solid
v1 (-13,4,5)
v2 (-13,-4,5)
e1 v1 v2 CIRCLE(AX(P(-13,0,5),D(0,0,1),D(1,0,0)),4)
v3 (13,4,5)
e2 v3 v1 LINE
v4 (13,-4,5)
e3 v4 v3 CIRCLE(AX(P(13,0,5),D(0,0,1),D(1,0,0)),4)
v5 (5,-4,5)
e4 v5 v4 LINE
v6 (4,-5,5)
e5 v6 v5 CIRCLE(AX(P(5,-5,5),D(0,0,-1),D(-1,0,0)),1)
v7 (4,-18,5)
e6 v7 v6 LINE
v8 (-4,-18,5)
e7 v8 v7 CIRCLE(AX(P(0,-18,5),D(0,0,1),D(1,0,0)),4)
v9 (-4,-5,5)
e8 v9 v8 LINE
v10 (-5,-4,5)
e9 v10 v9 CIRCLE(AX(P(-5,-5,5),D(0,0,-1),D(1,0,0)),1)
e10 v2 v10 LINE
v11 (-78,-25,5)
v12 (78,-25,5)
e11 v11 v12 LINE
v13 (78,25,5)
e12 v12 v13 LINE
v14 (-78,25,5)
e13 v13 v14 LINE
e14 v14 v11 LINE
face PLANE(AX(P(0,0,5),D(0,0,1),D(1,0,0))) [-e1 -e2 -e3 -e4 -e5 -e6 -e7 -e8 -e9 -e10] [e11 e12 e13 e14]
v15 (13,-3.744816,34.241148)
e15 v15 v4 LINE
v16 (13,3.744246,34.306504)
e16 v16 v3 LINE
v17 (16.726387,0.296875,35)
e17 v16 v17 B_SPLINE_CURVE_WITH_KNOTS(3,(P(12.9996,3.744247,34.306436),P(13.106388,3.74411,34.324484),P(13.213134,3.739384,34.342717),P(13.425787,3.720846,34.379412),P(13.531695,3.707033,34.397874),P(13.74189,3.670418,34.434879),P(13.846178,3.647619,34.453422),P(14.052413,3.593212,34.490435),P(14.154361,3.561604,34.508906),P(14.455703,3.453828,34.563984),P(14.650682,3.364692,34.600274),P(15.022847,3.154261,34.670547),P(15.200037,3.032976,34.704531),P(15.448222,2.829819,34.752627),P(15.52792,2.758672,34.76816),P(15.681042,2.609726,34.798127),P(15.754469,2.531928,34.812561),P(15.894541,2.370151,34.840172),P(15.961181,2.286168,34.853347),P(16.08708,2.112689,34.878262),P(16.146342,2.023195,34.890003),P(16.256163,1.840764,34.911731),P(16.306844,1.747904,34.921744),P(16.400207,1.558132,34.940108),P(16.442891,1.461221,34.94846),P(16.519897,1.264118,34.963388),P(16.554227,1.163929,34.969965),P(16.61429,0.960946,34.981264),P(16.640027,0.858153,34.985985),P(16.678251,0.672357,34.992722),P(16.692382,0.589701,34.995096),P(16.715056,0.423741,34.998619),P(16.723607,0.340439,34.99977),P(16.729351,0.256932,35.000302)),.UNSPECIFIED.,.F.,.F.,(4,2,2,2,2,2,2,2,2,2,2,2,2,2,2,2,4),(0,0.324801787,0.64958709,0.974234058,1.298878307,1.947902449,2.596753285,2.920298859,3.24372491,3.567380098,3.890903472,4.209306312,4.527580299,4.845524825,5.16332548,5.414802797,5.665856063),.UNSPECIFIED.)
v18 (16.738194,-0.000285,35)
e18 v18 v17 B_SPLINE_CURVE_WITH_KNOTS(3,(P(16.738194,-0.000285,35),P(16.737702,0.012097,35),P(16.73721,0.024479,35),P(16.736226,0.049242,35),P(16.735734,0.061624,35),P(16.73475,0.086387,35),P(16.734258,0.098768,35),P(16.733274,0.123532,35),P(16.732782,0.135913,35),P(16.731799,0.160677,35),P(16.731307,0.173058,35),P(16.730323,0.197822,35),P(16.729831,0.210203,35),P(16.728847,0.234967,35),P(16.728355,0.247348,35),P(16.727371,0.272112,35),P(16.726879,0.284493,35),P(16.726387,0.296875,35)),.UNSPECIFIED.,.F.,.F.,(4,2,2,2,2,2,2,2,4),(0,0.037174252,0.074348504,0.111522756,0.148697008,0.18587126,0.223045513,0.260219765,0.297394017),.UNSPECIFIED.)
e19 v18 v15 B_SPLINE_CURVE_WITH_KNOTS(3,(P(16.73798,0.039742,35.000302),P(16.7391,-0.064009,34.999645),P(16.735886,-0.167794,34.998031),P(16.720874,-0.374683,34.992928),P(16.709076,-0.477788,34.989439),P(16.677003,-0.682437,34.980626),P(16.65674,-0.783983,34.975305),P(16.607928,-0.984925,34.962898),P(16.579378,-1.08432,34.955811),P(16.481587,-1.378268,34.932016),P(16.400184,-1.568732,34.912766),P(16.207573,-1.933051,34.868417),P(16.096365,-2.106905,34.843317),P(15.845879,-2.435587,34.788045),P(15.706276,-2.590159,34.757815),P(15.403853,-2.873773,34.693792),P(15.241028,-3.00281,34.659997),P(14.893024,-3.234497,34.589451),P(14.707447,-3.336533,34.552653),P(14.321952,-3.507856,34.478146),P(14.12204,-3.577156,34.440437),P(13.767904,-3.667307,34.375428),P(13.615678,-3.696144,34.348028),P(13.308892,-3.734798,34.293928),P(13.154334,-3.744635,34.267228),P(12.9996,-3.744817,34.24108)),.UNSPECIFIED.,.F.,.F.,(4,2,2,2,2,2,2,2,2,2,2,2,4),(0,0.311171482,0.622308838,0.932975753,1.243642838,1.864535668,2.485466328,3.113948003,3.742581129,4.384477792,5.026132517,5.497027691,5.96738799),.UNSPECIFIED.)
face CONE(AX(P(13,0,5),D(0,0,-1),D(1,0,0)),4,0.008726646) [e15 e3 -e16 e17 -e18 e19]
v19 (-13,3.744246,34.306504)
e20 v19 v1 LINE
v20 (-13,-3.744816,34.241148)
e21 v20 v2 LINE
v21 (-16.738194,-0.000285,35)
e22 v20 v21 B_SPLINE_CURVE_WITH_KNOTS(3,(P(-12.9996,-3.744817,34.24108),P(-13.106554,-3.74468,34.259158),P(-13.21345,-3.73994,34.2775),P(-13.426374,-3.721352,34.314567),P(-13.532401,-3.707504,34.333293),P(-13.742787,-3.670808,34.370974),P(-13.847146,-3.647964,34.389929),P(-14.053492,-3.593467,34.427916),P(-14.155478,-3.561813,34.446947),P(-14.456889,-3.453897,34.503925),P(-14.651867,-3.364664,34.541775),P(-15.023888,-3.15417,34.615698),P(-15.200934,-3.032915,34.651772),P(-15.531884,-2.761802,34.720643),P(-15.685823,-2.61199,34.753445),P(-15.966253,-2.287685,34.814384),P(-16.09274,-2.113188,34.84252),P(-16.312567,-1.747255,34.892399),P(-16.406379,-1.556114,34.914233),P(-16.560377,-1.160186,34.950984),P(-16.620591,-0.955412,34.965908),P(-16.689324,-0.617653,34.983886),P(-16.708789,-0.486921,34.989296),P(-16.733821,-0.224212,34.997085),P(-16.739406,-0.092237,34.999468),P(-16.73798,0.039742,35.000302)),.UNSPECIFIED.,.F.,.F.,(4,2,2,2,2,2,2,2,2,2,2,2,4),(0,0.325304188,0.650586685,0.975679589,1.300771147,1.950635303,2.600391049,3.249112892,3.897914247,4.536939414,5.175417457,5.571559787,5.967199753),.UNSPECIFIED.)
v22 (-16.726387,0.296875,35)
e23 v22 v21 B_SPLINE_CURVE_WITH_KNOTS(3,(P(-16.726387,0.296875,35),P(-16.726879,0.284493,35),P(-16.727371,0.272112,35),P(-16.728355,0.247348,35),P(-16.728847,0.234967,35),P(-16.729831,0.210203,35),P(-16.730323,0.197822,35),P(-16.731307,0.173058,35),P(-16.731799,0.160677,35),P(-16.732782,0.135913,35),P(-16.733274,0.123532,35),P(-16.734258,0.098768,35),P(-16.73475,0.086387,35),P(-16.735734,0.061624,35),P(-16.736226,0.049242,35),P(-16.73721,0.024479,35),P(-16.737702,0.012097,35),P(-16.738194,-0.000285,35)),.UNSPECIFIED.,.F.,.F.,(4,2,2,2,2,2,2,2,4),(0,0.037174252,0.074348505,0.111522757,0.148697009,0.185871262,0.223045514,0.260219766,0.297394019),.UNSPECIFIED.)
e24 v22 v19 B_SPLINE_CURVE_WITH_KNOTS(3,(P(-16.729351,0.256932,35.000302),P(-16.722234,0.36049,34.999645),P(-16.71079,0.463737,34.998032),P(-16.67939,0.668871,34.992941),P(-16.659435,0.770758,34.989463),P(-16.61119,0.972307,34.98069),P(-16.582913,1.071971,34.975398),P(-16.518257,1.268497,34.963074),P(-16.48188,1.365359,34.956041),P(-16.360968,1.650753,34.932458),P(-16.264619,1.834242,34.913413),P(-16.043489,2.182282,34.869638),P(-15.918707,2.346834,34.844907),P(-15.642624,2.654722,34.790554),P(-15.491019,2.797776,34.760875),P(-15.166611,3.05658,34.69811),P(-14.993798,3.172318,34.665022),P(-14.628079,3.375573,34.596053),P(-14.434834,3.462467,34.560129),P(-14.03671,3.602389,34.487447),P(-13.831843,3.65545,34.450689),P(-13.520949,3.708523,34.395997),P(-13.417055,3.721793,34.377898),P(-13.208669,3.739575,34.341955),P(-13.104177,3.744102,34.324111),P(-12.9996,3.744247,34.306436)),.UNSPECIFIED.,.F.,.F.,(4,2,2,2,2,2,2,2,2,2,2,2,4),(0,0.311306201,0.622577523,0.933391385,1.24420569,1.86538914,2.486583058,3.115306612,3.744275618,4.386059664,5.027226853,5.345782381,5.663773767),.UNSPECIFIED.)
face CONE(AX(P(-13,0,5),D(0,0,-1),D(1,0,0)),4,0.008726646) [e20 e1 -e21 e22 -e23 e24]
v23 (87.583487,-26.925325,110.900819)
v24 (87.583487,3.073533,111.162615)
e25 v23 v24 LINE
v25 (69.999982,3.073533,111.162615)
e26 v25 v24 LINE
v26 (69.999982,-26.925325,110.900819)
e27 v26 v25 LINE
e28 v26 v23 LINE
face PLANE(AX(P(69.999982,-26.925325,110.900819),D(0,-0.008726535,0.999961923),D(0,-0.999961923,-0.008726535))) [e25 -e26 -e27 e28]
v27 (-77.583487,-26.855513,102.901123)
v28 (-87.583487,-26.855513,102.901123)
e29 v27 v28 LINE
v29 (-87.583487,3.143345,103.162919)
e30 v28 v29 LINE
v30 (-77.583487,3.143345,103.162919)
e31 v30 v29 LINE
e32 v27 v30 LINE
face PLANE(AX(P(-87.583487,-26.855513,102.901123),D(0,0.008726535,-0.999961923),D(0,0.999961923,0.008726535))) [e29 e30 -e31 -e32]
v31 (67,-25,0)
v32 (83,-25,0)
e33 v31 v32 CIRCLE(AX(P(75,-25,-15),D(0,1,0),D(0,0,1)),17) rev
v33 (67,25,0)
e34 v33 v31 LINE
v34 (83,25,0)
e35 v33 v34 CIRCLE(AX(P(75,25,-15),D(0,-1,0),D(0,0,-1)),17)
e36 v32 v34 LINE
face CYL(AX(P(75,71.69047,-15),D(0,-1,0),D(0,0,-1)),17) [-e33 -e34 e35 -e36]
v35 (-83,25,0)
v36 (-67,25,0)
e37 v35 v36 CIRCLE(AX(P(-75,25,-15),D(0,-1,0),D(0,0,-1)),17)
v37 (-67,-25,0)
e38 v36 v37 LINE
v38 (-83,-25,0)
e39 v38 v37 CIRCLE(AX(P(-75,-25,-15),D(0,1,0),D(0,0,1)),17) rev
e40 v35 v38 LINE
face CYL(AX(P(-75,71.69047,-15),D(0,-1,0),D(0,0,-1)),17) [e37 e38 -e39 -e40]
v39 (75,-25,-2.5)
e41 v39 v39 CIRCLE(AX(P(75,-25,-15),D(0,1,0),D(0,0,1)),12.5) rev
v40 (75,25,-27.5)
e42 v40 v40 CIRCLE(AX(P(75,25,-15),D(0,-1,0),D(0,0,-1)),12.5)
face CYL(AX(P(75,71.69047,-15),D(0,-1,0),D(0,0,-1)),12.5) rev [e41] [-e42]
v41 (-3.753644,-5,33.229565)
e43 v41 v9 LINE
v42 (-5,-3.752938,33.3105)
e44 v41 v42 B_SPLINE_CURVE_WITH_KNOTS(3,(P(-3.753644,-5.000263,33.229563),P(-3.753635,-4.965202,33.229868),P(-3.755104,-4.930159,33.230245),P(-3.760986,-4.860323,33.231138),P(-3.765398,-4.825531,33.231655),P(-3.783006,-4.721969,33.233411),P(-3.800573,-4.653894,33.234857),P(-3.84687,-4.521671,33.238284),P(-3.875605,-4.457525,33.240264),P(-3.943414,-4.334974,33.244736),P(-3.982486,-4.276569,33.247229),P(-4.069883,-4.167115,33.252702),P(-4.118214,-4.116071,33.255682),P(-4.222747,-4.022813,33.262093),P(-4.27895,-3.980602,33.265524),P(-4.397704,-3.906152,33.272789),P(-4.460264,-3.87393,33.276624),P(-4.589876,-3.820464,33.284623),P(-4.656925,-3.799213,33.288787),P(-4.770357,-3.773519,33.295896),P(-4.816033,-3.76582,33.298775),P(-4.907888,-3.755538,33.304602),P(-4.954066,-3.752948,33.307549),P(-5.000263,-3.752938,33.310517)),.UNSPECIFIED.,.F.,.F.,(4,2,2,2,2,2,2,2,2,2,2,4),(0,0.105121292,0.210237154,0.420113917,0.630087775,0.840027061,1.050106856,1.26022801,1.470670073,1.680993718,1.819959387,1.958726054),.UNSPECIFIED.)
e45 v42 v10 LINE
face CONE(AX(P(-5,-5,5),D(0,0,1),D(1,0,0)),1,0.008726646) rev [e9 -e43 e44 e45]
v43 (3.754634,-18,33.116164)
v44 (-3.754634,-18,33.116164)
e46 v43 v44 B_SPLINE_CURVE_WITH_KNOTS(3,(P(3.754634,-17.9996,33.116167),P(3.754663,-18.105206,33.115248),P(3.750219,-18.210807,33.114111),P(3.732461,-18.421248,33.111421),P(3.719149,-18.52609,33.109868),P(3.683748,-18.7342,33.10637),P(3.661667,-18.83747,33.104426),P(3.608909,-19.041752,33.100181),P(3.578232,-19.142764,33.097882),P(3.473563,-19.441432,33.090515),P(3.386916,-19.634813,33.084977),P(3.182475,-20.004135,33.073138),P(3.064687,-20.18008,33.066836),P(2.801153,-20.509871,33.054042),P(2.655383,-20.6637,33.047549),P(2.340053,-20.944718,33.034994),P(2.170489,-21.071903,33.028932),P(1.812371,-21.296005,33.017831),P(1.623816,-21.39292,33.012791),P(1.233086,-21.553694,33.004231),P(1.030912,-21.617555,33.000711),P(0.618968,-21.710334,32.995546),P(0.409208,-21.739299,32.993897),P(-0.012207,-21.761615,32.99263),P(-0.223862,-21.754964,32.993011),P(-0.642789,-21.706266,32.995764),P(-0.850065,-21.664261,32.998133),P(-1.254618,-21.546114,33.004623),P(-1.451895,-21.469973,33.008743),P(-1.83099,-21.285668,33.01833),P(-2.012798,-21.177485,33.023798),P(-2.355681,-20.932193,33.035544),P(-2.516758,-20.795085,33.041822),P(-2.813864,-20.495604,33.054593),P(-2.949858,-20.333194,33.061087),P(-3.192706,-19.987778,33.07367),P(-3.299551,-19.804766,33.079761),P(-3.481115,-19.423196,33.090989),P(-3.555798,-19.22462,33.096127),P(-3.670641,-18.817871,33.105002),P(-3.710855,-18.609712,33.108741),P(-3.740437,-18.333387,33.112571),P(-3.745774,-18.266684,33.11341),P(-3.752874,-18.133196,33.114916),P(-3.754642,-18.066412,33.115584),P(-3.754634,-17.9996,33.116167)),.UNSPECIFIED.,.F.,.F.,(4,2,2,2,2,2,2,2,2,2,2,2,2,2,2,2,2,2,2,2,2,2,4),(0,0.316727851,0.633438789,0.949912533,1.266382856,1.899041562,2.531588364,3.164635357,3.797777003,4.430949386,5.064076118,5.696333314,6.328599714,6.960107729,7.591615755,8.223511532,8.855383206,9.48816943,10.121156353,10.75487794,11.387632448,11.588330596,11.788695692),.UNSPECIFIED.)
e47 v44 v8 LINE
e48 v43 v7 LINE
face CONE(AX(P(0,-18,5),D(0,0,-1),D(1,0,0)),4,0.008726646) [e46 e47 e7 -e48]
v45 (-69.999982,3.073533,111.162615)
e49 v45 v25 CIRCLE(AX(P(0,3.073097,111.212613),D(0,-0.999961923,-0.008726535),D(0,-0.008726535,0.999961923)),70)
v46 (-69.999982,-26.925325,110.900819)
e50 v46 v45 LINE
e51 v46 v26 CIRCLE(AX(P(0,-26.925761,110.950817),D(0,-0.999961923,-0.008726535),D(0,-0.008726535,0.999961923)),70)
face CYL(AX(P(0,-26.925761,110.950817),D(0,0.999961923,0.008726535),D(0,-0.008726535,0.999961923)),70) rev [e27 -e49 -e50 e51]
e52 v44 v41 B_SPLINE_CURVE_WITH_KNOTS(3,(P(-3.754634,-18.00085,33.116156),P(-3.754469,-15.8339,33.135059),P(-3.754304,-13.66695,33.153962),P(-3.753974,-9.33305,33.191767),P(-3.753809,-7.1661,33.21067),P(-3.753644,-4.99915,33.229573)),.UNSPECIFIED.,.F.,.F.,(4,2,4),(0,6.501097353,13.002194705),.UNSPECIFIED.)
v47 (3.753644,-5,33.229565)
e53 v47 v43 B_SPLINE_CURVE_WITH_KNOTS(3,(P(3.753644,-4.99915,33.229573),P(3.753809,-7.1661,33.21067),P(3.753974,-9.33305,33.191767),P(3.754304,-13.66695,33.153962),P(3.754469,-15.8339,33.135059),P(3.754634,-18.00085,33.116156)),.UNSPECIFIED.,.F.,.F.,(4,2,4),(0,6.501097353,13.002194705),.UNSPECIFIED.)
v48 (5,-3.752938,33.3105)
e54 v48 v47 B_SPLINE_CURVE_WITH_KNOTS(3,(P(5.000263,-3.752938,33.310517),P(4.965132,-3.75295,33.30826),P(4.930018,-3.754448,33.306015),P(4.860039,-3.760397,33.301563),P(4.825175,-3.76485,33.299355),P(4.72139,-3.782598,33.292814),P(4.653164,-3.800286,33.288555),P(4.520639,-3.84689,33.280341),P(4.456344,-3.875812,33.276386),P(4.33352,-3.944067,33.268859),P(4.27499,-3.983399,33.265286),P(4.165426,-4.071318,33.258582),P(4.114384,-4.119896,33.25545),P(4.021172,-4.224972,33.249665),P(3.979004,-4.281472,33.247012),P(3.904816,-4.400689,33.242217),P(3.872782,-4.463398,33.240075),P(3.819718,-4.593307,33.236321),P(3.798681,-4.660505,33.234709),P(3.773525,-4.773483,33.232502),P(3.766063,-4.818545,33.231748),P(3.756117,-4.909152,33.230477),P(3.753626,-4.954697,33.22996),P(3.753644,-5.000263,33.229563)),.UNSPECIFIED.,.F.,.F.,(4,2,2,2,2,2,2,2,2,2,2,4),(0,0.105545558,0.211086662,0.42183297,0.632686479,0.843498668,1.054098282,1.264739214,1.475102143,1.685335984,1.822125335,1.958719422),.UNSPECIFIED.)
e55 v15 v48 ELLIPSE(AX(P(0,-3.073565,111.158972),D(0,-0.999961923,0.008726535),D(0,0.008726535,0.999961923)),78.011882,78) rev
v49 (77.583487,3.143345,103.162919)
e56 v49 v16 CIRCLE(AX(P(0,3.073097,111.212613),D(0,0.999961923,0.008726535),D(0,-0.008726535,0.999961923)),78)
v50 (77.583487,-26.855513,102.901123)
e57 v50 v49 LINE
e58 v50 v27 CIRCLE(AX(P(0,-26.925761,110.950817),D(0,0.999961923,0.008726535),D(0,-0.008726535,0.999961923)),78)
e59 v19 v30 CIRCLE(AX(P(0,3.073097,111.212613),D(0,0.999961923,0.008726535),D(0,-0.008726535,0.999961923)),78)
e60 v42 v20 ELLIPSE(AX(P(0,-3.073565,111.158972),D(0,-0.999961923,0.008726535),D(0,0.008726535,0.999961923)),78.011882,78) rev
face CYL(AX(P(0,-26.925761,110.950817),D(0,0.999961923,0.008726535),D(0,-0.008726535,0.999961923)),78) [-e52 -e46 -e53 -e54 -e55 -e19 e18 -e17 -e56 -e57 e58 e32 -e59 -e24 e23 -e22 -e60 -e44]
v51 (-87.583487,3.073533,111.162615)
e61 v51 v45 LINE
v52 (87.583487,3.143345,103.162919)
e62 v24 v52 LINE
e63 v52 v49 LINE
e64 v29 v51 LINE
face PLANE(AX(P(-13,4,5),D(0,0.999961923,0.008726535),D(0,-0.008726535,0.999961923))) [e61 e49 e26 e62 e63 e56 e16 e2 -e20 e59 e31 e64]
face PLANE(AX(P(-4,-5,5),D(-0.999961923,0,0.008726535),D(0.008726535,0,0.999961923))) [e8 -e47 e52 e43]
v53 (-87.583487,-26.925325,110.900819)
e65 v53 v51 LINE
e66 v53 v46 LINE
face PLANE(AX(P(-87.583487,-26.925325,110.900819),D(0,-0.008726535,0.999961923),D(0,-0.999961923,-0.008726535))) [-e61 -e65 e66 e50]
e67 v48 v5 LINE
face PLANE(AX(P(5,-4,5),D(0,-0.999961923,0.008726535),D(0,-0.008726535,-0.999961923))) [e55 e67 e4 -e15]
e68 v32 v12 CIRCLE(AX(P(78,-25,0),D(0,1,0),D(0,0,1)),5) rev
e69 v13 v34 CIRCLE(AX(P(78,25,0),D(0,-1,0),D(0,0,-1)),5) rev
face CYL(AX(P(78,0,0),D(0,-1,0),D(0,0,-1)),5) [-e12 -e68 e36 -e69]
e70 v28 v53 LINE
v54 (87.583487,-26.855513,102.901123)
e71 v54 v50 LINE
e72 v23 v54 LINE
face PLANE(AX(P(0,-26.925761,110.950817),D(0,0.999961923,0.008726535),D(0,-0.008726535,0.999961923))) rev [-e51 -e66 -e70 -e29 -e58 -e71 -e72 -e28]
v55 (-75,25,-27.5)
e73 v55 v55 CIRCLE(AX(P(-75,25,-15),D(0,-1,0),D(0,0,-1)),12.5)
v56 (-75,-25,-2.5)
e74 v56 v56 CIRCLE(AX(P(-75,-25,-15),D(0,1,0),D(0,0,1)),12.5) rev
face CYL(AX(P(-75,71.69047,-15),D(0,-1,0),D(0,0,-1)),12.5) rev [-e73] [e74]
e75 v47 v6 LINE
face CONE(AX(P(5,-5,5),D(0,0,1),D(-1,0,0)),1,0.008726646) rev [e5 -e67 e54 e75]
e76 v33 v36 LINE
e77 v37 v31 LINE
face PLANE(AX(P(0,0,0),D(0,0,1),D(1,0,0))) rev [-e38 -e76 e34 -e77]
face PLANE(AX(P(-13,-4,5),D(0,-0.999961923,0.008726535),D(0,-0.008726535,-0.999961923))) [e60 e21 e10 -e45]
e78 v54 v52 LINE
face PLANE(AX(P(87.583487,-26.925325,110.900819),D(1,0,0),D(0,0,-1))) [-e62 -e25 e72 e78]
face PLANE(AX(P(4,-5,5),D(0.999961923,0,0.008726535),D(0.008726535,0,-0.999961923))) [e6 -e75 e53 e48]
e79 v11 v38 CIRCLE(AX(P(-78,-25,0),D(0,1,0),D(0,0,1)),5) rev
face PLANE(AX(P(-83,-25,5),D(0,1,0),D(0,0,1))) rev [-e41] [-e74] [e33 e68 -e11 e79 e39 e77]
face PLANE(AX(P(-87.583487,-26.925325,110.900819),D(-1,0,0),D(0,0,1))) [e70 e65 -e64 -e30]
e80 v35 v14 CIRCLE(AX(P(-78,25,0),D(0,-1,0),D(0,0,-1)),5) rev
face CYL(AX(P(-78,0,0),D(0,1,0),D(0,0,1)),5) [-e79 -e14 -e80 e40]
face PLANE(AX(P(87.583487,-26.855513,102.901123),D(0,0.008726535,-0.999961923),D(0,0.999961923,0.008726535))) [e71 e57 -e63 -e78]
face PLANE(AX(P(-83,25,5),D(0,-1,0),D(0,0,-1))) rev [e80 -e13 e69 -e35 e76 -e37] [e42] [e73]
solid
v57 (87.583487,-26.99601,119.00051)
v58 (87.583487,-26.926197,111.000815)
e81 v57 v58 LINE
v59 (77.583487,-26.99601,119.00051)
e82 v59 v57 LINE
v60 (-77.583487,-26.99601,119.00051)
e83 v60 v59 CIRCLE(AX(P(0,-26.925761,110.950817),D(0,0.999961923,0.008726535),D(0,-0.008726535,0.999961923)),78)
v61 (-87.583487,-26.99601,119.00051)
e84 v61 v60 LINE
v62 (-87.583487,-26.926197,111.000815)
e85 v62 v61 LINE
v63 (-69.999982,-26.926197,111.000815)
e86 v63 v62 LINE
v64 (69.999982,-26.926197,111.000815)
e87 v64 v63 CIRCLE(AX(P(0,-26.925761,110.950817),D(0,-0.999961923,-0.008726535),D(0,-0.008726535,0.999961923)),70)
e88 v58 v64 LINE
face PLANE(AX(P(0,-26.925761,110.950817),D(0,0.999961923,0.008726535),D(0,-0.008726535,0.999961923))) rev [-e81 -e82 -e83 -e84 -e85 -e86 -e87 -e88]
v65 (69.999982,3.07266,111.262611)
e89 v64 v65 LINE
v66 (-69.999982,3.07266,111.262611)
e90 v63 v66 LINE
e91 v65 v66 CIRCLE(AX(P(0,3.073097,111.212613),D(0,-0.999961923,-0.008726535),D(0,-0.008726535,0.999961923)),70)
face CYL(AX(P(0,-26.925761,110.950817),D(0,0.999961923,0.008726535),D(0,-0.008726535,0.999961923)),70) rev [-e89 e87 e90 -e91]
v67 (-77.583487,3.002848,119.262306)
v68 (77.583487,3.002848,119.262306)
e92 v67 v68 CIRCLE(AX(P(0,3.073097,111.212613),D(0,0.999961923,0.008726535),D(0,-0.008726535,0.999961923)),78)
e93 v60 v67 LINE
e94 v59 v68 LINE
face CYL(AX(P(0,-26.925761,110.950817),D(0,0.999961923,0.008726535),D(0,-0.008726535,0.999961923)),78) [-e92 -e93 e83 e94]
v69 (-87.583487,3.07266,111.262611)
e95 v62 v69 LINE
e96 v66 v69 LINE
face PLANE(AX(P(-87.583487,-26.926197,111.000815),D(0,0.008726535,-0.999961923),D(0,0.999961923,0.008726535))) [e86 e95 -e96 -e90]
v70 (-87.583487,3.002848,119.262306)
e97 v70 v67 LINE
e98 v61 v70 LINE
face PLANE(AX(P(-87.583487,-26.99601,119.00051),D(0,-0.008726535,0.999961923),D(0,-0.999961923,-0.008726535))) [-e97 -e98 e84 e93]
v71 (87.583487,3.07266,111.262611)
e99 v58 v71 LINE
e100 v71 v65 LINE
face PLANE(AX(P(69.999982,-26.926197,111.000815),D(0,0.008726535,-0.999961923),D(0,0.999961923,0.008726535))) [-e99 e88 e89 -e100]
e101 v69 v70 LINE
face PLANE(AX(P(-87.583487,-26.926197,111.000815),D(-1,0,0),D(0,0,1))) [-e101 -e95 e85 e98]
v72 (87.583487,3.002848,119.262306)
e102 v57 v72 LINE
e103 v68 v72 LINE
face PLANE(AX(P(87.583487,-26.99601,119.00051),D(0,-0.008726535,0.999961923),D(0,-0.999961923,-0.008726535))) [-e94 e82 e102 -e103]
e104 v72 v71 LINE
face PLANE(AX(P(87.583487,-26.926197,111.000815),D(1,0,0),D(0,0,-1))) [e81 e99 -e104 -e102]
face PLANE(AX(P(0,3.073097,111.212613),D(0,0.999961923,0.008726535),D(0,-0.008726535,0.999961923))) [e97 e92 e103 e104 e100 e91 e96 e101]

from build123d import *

# Parameters (mm, degrees)
SKETCH_1_W                  = 166
SKETCH_1_H                  = 50
EXTRUDE_1_DEPTH             = 5
EXTRUDE_4_REACH             = 88.827
SKETCH_4_R                  = 12.5
EXTRUDE_4_DIRECTION_2_REACH = 88.827
FILLET_1_R                  = 5
EXTRUDE_2_DEPTH             = 30
EXTRUDE_2_TAPER             = 0.5
EXTRUDE_3_DEPTH             = 30


with BuildPart() as part:
    # Эскиз1 → Бобышка-Вытянуть1 (new body)
    with BuildSketch(Plane.XY):
        Rectangle(SKETCH_1_W, SKETCH_1_H)
    extrude(amount=EXTRUDE_1_DEPTH)

    # Бобышка-Вытянуть4: up to this face of the body (flat: up to its plane)
    extrude_4_end = Plane(part.part.faces().sort_by_distance((0, 25, 2.5))[0])
    # Эскиз4 → Бобышка-Вытянуть4 (add, up to the picked face)
    with BuildSketch(Plane(origin=(0, 0, 0), x_dir=(1, 0, 0), z_dir=(0, 1, 0)), mode=Mode.PRIVATE) as extrude_4_sk1:
        with BuildLine():
            Line((-83, 0), (-67, 0))
            ThreePointArc((-67, 0), (-75, 32), (-83, 0))
        make_face()
        with Locations(Location((-75, 15, 0), (0, 0, 90))):
            Circle(SKETCH_4_R, mode=Mode.SUBTRACT)
    extrude_4_tool1 = split(extrude(extrude_4_sk1.sketch, amount=EXTRUDE_4_REACH, mode=Mode.PRIVATE), bisect_by=extrude_4_end, keep=Keep.BOTH, mode=Mode.PRIVATE)
    # Эскиз4 → Бобышка-Вытянуть4 (add, up to the picked face)
    with BuildSketch(Plane(origin=(0, 0, 0), x_dir=(1, 0, 0), z_dir=(0, 1, 0)), mode=Mode.PRIVATE) as extrude_4_sk2:
        with BuildLine():
            Line((83, 0), (67, 0))
            ThreePointArc((67, 0), (75, 32), (83, 0))
        make_face()
        with Locations(Location((75, 15, 0), (0, 0, 90))):
            Circle(SKETCH_4_R, mode=Mode.SUBTRACT)
    extrude_4_tool2 = split(extrude(extrude_4_sk2.sketch, amount=EXTRUDE_4_REACH, mode=Mode.PRIVATE), bisect_by=extrude_4_end, keep=Keep.BOTH, mode=Mode.PRIVATE)
    add(extrude_4_tool1.solids().sort_by(Axis((-75, 0, -31.533095), (0, 1, 0)))[0])
    add(extrude_4_tool2.solids().sort_by(Axis((75, 0, -31.533095), (0, 1, 0)))[0])

    # Бобышка-Вытянуть4 direction 2: up to this face of the body (flat: up to its plane)
    extrude_4_direction_2_end = Plane(part.part.faces().sort_by_distance((0, -25, 2.5))[0])
    # Эскиз4 → Бобышка-Вытянуть4 direction 2 (add, up to the picked face)
    with BuildSketch(Plane(origin=(0, 0, 0), x_dir=(1, 0, 0), z_dir=(0, 1, 0)), mode=Mode.PRIVATE) as extrude_4_direction_2_sk1:
        with BuildLine():
            Line((-83, 0), (-67, 0))
            ThreePointArc((-67, 0), (-75, 32), (-83, 0))
        make_face()
        with Locations(Location((-75, 15, 0), (0, 0, 90))):
            Circle(SKETCH_4_R, mode=Mode.SUBTRACT)
    extrude_4_direction_2_tool1 = split(extrude(extrude_4_direction_2_sk1.sketch, amount=-EXTRUDE_4_DIRECTION_2_REACH, mode=Mode.PRIVATE), bisect_by=extrude_4_direction_2_end, keep=Keep.BOTH, mode=Mode.PRIVATE)
    # Эскиз4 → Бобышка-Вытянуть4 direction 2 (add, up to the picked face)
    with BuildSketch(Plane(origin=(0, 0, 0), x_dir=(1, 0, 0), z_dir=(0, 1, 0)), mode=Mode.PRIVATE) as extrude_4_direction_2_sk2:
        with BuildLine():
            Line((83, 0), (67, 0))
            ThreePointArc((67, 0), (75, 32), (83, 0))
        make_face()
        with Locations(Location((75, 15, 0), (0, 0, 90))):
            Circle(SKETCH_4_R, mode=Mode.SUBTRACT)
    extrude_4_direction_2_tool2 = split(extrude(extrude_4_direction_2_sk2.sketch, amount=-EXTRUDE_4_DIRECTION_2_REACH, mode=Mode.PRIVATE), bisect_by=extrude_4_direction_2_end, keep=Keep.BOTH, mode=Mode.PRIVATE)
    add(extrude_4_direction_2_tool1.solids().sort_by(Axis((-75, 0, -31.533095), (0, -1, 0)))[0])
    add(extrude_4_direction_2_tool2.solids().sort_by(Axis((75, 0, -31.533095), (0, -1, 0)))[0])

    # Скругление1
    fillet_1_edges = [part.edges().sort_by_distance(p)[0] for p in [
        (83, 0, 5),
        (-83, 0, 5),
    ]]
    fillet(fillet_1_edges, radius=FILLET_1_R - 0.0001)  # a hair under: the kernel refuses the full size

    # Эскиз2 → Бобышка-Вытянуть2 (add)
    with BuildSketch(Plane.XY.offset(5)):
        with BuildLine():
            ThreePointArc((-13, 4), (-17, 0), (-13, -4))
            Line((-13, -4), (-5, -4))
            ThreePointArc((-5, -4), (-4.292893219, -4.292893219), (-4, -5))
            Line((-4, -5), (-4, -18))
            ThreePointArc((-4, -18), (0, -22), (4, -18))
            Line((4, -18), (4, -5))
            ThreePointArc((4, -5), (4.292893219, -4.292893219), (5, -4))
            Line((5, -4), (13, -4))
            ThreePointArc((13, -4), (17, 0), (13, 4))
            Line((13, 4), (-13, 4))
        make_face()
    extrude(amount=EXTRUDE_2_DEPTH, taper=EXTRUDE_2_TAPER)

    # Эскиз3 → Бобышка-Вытянуть3 (add)
    with BuildSketch(Plane(origin=(0, 4.043326406, 0.035285575), x_dir=(1, 0, 0), z_dir=(0, 0.9999619230641713, 0.008726535498373954))):
        with BuildLine():
            Line((69.999982143, -111.131560673), (87.583487289, -111.131560673))
            Line((87.583487289, -111.131560673), (87.583487289, -103.131560673))
            Line((87.583487289, -103.131560673), (77.583487289, -103.131560673))
            ThreePointArc((77.583487289, -103.131560673), (0, -33.181560673), (-77.583487289, -103.131560673))
            Line((-77.583487289, -103.131560673), (-87.583487289, -103.131560673))
            Line((-87.583487289, -103.131560673), (-87.583487289, -111.131560673))
            Line((-87.583487289, -111.131560673), (-69.999982143, -111.131560673))
            ThreePointArc((-69.999982143, -111.131560673), (0, -41.181560673), (69.999982143, -111.131560673))
        make_face()
        with BuildLine():
            Line((-87.583487289, -111.231560673), (-69.999982143, -111.231560673))
            ThreePointArc((-69.999982143, -111.231560673), (0, -181.181560673), (69.999982143, -111.231560673))
            Line((69.999982143, -111.231560673), (87.583487289, -111.231560673))
            Line((87.583487289, -111.231560673), (87.583487289, -119.231560673))
            Line((87.583487289, -119.231560673), (77.583487289, -119.231560673))
            ThreePointArc((77.583487289, -119.231560673), (0, -189.181560673), (-77.583487289, -119.231560673))
            Line((-77.583487289, -119.231560673), (-87.583487289, -119.231560673))
            Line((-87.583487289, -119.231560673), (-87.583487289, -111.231560673))
        make_face()
    extrude(amount=-EXTRUDE_3_DEPTH)


with BuildPart() as extrude_3_piece_1:
    # of the separate pieces the step leaves, piece 1, a body of its own (extrude_3_pieces)
    add(part.part.solids().sort_by_distance((-83, 25, 0.0001))[0])


with BuildPart() as extrude_3_piece_2:
    # of the separate pieces the step leaves, piece 2, a body of its own (extrude_3_pieces)
    add(part.part.solids().sort_by_distance((-77.583487289, 3.00284796, 119.262306276))[0])


solid = Compound([extrude_3_piece_1.part, extrude_3_piece_2.part])
